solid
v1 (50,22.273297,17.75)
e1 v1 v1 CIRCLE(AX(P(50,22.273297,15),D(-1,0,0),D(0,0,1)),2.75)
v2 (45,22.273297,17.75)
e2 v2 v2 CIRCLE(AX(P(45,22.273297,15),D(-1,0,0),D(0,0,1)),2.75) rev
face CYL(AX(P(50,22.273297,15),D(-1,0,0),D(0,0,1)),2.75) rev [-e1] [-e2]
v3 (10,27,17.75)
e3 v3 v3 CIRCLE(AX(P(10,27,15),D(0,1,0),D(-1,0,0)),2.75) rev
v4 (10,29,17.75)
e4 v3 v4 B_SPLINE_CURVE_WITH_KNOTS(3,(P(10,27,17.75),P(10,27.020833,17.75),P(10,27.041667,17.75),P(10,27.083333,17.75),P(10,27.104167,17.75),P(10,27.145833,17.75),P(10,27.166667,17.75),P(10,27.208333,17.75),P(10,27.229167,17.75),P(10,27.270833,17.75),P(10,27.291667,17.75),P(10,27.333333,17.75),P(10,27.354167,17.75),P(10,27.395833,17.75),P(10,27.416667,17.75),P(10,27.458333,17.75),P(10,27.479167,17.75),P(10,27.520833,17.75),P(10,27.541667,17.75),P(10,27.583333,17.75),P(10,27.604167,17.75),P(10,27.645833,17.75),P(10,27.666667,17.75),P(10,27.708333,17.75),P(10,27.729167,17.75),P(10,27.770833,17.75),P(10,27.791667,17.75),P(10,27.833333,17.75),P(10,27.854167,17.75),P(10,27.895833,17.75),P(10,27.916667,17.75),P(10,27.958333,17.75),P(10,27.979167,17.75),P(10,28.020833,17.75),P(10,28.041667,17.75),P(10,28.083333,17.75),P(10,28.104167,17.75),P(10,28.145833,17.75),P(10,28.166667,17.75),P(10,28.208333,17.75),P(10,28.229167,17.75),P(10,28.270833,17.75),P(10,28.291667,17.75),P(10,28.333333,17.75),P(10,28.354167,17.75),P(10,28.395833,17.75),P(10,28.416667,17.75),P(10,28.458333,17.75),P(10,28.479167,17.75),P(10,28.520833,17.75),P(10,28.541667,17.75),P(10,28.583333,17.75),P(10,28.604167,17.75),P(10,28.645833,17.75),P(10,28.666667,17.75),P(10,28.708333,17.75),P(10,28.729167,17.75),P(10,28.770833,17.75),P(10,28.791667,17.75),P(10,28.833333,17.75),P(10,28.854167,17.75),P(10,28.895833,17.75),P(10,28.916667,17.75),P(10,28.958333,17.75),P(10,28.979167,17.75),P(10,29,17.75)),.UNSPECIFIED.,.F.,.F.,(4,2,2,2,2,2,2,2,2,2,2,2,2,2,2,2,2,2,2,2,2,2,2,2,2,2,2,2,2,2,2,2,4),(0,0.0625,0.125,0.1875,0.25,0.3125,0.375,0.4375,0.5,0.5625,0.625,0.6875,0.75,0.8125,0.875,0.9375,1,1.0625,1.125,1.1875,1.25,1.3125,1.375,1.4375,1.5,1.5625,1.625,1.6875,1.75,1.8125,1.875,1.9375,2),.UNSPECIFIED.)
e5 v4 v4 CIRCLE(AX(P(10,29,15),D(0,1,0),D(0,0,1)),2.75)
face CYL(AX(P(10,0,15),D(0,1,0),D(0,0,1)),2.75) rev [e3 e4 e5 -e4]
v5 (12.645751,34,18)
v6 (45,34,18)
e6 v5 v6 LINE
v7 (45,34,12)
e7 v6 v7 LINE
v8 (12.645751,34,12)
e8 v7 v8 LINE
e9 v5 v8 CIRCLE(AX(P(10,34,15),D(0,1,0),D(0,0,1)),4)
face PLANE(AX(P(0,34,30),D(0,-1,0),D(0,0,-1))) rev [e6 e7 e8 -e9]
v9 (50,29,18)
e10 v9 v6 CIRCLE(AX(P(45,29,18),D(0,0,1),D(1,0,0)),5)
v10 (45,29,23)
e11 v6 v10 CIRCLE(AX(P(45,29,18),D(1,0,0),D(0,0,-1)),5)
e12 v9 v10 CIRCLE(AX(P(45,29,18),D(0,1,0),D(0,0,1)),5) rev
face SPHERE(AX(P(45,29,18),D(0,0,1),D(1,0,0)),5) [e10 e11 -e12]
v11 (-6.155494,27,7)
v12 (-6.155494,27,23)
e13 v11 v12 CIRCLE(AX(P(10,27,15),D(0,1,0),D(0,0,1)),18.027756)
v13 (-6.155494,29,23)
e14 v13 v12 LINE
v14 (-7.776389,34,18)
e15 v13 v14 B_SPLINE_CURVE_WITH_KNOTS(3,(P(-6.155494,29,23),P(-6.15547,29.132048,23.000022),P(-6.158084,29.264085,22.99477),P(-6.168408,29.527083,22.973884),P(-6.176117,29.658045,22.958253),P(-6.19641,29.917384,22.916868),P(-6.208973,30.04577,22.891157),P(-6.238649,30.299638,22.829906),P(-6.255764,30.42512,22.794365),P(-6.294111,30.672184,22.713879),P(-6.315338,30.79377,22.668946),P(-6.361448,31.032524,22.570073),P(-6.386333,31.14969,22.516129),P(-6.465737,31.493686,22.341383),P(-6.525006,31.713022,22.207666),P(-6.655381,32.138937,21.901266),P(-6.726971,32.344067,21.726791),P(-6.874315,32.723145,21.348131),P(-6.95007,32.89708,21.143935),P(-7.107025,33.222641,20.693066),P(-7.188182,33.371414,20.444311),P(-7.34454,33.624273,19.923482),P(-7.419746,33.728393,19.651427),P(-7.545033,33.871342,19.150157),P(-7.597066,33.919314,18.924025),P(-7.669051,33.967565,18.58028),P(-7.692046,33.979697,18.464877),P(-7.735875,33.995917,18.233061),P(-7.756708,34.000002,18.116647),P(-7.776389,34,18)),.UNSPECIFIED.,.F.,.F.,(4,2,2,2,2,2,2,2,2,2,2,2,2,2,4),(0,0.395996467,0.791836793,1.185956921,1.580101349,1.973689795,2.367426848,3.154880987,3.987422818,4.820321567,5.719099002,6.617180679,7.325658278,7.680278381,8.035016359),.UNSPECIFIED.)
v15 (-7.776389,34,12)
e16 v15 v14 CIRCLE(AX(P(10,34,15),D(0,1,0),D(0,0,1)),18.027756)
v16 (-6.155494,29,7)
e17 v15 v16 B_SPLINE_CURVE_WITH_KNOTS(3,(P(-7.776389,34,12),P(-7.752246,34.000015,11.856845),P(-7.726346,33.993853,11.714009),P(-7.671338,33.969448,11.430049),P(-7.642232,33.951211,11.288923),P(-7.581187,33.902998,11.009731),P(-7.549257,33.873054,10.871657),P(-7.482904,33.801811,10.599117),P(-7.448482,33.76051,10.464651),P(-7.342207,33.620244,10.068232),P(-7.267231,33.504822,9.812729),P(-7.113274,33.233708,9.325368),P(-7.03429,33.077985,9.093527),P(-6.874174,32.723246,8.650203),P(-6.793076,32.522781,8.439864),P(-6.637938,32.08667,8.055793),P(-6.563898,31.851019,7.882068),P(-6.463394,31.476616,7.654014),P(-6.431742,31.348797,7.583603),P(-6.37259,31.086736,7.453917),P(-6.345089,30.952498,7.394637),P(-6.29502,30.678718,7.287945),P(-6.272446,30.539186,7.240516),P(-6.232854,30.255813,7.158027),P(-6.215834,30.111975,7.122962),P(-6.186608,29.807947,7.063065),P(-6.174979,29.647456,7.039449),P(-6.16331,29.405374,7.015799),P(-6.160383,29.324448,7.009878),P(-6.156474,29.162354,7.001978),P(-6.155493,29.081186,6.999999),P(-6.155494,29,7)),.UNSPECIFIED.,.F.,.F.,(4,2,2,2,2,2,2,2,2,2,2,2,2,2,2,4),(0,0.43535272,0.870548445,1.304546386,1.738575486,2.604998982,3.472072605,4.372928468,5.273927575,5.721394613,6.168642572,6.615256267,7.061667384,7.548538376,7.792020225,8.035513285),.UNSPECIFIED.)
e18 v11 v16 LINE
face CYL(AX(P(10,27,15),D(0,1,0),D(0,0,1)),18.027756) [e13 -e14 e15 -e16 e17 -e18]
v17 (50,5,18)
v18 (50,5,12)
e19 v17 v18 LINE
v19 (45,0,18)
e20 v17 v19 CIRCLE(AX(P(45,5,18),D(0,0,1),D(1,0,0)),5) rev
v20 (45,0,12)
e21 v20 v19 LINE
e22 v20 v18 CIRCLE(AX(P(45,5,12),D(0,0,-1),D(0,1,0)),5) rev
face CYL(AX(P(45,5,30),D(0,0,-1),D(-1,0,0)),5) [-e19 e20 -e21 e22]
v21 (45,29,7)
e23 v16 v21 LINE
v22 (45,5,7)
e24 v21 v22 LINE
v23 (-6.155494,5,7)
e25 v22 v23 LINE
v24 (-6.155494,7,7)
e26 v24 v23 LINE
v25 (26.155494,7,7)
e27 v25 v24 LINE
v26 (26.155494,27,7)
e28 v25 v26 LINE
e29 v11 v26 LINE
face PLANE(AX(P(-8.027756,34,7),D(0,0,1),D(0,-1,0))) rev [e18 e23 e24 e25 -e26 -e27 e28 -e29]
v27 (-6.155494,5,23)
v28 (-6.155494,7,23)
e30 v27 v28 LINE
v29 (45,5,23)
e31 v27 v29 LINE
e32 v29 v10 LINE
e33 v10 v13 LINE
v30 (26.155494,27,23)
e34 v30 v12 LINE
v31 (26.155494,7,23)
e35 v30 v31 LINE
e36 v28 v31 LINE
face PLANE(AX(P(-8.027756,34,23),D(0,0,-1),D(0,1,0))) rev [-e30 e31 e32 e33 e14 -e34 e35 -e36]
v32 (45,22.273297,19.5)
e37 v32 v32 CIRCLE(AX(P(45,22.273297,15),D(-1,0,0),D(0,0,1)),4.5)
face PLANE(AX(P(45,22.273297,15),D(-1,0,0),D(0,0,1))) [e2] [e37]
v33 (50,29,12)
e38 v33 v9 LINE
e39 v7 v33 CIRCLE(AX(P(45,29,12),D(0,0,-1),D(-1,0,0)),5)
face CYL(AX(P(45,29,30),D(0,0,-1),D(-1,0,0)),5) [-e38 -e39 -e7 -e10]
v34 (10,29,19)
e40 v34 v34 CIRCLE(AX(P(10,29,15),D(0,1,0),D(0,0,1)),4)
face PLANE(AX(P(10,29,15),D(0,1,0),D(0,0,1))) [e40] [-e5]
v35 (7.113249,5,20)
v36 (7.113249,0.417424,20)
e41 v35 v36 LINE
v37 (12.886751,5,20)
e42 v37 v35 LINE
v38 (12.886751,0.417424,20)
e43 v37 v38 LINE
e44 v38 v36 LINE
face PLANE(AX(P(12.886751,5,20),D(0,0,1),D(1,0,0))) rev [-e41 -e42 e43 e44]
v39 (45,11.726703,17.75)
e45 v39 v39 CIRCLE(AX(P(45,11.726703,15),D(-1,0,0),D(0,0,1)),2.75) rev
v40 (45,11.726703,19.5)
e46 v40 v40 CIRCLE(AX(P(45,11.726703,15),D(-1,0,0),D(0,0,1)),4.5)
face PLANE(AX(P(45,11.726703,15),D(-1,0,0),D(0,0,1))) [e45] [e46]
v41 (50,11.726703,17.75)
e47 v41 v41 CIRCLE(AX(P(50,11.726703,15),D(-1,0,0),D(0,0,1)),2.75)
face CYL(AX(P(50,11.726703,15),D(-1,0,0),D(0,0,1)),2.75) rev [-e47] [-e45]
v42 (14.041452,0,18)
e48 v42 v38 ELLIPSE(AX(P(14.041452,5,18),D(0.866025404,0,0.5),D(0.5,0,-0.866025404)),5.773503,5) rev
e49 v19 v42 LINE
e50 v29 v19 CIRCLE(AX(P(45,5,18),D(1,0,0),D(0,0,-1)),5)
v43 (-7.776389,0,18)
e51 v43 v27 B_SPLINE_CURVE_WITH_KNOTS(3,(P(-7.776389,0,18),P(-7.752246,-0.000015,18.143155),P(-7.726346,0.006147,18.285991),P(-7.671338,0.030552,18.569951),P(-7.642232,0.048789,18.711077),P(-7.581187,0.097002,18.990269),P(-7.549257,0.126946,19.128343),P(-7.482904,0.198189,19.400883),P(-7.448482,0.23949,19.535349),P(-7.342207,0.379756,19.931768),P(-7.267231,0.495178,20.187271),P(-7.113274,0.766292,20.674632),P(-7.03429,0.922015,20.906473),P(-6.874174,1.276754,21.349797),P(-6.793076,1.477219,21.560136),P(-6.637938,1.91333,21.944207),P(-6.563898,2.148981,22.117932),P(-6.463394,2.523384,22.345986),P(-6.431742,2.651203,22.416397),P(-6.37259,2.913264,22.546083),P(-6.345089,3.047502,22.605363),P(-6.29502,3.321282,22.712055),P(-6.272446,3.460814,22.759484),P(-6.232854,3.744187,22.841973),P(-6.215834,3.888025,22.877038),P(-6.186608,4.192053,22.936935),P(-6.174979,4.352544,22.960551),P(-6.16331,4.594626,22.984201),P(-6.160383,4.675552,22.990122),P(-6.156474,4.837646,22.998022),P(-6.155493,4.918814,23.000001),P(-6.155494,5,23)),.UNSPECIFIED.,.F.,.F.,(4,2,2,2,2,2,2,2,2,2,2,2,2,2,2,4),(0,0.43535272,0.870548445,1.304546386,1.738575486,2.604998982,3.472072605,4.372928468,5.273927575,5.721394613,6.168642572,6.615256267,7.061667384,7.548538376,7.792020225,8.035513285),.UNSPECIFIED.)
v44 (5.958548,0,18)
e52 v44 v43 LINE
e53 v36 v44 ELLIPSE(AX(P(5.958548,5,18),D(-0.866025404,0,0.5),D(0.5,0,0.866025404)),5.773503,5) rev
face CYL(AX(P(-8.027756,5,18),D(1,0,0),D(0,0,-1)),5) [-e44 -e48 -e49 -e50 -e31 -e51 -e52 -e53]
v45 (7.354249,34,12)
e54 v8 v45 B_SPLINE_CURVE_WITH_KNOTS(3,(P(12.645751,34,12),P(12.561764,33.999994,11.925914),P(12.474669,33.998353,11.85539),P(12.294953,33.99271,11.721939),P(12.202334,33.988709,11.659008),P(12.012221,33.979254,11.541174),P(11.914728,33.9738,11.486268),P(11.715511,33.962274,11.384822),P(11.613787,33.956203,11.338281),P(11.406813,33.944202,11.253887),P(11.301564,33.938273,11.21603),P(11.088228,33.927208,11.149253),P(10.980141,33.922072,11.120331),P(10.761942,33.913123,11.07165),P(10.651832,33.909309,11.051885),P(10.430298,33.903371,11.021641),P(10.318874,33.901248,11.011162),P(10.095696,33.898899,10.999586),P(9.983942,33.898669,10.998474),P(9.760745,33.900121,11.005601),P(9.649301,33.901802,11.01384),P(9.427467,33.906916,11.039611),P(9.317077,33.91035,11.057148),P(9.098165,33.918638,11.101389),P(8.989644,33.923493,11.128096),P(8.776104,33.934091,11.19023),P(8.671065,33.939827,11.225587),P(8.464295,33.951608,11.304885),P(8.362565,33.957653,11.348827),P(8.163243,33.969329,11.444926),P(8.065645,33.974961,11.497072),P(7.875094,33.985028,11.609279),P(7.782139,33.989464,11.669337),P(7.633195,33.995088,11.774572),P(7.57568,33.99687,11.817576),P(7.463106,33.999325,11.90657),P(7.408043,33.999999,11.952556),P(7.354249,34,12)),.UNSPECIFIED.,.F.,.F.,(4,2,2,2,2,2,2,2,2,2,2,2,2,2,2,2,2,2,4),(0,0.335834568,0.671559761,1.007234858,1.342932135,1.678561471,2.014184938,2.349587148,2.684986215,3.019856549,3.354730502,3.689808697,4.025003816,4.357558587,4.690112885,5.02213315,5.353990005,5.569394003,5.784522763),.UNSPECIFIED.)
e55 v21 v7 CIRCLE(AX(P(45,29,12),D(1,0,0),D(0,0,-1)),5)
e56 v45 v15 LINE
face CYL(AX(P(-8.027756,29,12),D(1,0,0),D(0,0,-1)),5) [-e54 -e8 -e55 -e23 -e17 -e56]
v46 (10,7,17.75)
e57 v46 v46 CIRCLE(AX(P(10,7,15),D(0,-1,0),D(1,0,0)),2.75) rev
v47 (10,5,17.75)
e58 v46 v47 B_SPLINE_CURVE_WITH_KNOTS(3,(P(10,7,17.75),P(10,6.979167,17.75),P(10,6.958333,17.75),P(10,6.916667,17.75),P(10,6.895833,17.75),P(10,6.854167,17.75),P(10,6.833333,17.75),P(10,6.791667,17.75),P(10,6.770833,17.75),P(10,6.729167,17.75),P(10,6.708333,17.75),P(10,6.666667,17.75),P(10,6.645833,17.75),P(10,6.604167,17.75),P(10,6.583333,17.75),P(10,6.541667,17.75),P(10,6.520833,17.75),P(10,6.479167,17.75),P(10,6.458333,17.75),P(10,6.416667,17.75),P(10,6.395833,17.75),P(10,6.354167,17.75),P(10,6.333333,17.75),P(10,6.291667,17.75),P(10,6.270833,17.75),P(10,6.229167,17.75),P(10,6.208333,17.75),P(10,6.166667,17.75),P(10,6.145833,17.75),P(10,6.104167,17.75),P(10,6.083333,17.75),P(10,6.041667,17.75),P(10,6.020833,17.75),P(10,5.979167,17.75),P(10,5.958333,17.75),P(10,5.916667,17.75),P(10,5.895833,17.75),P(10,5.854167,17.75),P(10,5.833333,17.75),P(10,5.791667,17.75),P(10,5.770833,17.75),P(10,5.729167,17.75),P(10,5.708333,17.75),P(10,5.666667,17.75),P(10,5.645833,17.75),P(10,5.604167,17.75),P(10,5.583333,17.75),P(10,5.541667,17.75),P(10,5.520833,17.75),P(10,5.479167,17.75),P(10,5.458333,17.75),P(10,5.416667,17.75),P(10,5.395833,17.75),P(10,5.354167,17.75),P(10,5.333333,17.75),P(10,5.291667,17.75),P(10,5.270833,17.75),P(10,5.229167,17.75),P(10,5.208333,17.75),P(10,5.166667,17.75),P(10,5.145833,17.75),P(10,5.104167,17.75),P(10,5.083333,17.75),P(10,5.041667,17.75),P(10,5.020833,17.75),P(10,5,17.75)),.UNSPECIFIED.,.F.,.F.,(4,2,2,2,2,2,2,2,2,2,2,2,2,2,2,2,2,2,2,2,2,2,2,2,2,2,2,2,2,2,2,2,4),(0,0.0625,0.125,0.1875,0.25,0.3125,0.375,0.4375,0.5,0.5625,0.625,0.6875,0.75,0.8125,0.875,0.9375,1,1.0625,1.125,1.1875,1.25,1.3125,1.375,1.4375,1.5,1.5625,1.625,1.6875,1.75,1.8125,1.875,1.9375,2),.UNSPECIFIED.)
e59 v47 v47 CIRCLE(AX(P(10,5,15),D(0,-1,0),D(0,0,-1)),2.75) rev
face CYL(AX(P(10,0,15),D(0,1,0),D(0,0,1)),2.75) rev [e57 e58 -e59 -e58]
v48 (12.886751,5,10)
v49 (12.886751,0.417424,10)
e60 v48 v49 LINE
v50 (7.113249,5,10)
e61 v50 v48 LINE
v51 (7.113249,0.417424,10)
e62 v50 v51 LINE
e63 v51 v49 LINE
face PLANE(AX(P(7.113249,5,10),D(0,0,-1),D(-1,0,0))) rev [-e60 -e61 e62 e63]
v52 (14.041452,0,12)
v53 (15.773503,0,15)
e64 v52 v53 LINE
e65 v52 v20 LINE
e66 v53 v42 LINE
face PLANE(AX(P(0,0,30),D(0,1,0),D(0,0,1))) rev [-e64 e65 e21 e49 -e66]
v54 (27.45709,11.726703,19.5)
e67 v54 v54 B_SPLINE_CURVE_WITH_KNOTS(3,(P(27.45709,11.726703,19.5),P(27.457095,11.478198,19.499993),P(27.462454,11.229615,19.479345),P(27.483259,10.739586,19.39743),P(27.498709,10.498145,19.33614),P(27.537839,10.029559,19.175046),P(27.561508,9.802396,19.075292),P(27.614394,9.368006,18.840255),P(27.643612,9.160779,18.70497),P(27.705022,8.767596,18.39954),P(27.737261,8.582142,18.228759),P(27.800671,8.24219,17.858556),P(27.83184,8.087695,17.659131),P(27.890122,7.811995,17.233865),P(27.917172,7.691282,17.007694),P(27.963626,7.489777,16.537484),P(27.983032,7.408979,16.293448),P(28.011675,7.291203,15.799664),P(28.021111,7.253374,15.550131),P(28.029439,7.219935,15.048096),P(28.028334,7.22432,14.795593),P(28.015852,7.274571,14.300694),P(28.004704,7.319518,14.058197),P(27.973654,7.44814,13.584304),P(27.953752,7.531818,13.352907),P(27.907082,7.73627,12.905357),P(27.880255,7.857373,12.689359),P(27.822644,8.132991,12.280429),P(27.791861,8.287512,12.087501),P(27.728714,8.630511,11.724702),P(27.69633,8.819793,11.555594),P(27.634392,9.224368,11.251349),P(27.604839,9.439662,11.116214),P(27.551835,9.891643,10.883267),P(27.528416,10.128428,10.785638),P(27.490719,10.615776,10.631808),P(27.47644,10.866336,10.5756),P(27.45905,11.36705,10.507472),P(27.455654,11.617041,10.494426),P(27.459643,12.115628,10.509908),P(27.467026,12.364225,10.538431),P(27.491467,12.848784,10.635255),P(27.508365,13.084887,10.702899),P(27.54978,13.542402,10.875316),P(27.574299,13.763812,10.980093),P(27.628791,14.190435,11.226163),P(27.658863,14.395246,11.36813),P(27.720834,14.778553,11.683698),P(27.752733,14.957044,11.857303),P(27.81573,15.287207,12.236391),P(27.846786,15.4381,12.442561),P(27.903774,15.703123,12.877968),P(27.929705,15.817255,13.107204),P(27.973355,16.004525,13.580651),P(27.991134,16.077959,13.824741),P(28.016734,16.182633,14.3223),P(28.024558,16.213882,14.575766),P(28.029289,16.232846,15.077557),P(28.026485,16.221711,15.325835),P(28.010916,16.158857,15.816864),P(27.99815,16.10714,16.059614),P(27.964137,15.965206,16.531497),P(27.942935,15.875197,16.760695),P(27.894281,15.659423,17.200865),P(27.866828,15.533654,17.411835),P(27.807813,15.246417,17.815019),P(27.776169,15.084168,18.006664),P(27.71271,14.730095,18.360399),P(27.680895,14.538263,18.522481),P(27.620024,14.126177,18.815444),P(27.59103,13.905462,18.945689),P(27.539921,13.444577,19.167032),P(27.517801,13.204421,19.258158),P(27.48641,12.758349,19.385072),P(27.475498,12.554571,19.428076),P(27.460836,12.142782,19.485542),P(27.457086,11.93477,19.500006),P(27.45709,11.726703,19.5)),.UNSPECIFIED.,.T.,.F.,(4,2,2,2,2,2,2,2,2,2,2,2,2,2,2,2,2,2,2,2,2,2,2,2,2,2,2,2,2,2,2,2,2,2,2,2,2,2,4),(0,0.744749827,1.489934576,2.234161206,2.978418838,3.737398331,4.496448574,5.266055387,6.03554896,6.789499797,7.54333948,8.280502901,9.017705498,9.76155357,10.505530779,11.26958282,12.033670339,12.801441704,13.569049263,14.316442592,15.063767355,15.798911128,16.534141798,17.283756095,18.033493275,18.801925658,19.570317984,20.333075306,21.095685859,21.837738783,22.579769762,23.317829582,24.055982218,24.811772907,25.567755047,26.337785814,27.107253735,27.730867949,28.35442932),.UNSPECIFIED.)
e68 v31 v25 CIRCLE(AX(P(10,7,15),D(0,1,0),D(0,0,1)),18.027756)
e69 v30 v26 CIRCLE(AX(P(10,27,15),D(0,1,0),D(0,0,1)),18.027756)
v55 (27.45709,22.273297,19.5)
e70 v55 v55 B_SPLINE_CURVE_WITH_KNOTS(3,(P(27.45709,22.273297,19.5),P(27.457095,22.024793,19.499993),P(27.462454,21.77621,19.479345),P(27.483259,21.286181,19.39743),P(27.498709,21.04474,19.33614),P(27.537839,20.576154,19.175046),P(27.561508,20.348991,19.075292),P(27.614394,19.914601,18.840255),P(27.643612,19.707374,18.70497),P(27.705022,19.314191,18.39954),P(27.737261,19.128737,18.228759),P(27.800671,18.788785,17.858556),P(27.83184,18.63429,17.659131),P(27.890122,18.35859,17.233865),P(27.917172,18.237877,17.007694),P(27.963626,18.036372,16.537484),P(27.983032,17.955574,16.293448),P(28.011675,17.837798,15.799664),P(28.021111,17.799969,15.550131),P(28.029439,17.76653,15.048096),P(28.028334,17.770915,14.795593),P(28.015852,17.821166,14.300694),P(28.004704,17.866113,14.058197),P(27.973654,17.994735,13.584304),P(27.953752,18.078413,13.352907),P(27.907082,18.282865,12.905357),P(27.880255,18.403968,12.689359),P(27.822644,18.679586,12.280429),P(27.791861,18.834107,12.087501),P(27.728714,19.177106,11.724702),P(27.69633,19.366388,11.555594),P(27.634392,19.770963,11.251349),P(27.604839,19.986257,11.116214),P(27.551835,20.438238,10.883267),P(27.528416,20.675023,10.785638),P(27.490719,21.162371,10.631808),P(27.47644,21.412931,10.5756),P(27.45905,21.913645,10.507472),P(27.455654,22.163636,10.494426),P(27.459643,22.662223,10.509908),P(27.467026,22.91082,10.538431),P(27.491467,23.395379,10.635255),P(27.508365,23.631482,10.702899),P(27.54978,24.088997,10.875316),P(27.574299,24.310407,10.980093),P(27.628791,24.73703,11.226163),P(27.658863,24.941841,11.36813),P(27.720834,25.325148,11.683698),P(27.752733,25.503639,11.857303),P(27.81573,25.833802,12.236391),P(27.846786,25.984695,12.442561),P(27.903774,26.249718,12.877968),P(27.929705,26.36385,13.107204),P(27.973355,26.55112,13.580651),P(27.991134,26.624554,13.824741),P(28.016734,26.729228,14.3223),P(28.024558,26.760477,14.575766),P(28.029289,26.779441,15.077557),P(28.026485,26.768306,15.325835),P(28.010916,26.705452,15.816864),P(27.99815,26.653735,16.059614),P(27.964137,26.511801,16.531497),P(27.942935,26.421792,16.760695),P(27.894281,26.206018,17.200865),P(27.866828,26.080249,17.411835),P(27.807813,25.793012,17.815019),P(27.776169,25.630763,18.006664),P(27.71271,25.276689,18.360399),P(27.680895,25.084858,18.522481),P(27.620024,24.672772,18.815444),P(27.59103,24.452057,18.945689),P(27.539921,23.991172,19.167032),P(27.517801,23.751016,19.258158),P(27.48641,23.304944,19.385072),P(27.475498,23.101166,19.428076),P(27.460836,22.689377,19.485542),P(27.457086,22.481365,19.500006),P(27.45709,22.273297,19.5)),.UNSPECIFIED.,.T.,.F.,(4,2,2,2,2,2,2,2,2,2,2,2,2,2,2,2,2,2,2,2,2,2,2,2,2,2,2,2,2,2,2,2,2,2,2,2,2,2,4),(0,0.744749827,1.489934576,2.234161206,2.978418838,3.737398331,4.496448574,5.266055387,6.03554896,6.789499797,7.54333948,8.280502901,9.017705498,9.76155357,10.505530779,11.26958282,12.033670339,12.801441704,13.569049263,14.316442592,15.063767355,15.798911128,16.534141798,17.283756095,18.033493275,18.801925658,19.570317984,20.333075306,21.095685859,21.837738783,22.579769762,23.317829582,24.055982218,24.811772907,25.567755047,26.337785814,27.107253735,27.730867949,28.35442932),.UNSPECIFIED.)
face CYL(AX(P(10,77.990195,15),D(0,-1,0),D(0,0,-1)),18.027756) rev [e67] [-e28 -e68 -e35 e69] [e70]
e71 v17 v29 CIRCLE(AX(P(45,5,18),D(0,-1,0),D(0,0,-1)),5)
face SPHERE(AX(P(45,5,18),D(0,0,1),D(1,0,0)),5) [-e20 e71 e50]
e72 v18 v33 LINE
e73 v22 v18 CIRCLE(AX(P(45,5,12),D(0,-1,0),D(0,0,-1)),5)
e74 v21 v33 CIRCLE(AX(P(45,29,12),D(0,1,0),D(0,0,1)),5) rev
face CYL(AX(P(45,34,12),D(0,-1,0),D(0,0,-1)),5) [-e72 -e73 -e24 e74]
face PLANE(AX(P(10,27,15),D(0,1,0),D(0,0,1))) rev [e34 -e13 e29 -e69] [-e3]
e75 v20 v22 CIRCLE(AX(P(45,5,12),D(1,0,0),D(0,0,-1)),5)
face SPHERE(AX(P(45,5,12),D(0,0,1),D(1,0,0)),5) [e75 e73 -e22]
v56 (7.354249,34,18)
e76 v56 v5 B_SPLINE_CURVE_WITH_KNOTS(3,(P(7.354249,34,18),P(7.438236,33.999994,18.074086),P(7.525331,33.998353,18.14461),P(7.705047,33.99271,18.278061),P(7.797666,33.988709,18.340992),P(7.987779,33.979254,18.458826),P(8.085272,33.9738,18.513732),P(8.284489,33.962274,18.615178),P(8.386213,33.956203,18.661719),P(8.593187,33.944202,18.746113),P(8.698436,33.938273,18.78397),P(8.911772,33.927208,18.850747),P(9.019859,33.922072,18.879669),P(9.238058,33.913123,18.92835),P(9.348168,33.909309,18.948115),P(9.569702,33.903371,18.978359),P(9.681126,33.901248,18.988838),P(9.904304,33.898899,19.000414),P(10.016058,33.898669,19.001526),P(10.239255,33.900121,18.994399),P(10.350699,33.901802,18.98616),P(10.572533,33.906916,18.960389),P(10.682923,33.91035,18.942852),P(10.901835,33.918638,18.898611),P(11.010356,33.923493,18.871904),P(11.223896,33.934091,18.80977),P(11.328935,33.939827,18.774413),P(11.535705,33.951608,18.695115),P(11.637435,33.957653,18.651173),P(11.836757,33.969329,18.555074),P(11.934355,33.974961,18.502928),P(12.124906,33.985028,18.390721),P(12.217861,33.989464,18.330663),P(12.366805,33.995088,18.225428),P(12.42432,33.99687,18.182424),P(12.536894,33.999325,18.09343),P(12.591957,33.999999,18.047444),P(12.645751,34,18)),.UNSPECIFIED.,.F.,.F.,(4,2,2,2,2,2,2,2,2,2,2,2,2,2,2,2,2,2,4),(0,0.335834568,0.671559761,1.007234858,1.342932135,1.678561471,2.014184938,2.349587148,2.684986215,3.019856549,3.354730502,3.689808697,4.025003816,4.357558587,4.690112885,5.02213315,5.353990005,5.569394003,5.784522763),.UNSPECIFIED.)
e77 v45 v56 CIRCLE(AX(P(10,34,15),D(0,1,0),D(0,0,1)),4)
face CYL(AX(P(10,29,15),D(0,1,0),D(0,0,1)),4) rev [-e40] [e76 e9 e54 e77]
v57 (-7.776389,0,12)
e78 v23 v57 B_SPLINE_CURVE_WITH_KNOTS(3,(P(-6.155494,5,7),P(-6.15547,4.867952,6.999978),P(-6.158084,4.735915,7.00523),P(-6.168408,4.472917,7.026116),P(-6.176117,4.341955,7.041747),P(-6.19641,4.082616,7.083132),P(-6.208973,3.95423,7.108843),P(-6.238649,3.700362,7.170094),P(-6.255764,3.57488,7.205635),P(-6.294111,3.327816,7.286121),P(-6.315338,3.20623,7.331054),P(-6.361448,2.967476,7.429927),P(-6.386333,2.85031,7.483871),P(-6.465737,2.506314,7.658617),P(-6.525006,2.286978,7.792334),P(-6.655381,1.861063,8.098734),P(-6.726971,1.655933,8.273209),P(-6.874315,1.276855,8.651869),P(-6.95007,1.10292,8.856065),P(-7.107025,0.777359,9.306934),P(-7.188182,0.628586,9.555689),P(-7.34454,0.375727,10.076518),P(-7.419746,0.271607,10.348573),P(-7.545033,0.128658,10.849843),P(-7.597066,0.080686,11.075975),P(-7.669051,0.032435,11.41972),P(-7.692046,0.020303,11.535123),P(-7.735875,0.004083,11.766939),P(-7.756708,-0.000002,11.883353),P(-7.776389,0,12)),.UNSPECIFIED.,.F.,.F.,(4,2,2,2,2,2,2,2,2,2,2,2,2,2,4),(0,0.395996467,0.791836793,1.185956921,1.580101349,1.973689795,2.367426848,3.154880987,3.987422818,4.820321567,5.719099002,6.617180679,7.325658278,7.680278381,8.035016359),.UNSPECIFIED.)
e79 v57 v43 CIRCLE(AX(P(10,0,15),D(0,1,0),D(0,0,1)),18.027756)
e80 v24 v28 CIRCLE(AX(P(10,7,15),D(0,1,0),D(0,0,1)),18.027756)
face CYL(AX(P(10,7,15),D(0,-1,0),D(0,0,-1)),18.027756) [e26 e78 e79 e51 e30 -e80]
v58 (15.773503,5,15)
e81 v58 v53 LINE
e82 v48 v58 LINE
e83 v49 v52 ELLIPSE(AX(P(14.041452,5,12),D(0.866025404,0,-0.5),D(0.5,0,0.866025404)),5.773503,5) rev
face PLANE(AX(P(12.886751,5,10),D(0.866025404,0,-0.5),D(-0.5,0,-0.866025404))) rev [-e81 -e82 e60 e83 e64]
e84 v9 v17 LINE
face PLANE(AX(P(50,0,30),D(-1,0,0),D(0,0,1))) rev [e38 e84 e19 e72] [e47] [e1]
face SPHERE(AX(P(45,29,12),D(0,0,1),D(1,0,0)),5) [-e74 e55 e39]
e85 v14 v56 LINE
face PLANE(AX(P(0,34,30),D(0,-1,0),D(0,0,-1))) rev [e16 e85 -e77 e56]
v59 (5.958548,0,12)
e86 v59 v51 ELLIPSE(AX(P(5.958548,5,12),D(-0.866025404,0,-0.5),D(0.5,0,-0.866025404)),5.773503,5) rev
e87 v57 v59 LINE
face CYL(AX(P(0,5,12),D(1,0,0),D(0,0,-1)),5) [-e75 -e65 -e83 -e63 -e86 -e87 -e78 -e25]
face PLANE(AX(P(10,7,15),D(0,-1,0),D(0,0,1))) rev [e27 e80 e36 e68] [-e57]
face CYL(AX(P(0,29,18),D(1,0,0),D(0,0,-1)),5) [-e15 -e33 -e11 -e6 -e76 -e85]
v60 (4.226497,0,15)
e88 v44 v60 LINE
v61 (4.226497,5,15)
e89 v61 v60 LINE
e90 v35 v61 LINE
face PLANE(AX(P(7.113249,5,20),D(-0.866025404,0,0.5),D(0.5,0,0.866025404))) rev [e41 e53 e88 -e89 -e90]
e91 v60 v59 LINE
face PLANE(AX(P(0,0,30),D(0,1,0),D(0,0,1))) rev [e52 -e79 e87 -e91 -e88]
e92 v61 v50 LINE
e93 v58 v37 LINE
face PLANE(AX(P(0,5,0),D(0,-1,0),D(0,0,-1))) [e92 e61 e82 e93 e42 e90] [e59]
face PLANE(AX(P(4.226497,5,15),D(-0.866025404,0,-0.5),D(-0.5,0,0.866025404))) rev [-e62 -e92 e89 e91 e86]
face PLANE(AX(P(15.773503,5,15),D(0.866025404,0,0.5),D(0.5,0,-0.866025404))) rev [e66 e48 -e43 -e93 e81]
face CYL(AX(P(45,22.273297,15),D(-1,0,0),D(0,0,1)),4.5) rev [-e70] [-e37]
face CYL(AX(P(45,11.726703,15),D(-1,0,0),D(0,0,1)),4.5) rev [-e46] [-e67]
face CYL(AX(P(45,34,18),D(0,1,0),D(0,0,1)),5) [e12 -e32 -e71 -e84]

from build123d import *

# Parameters (mm, degrees)
ESQUISSE1_W             = 50
ESQUISSE1_H             = 34
BOSS_EXTRU_1_DEPTH      = 30
BOSS_EXTRU_2_DEPTH      = 7
ESQUISSE4_R             = 4
ENL_V_MAT_EXTRU_1_DEPTH = 5
ESQUISSE5_R             = 2.75
ENL_V_MAT_EXTRU_2_DEPTH = 66.122960621
ENL_V_MAT_EXTRU_3_DEPTH = 5
ESQUISSE7_R             = 2.75
ENL_V_MAT_EXTRU_4_DEPTH = 68.498148123
ESQUISSE8_R             = 4.5
ENL_V_MAT_EXTRU_5_DEPTH = 45
ESQUISSE9_W             = 20
ESQUISSE9_H             = 20
ENL_V_MAT_EXTRU_6_DEPTH = 68.498148123
ESQUISSE11_R            = 18.027756377
ENL_V_MAT_EXTRU_7_DEPTH = 20
ESQUISSE12_W            = 7
ESQUISSE12_H            = 34
ENL_V_MAT_EXTRU_8_DEPTH = 74.642518399
CONG_1_R                = 5


with BuildPart() as part:
    # Esquisse1 → Boss.-Extru.1 (new body)
    with BuildSketch(Plane.XY):
        with Locations((25, 17)):
            Rectangle(ESQUISSE1_W, ESQUISSE1_H)
    extrude(amount=BOSS_EXTRU_1_DEPTH)

    # Esquisse3 → Boss.-Extru.2 (add)
    with BuildSketch(Plane(origin=(0, 34, 0), x_dir=(1, 0, 0), z_dir=(0, 1, 0))):
        with BuildLine():
            Line((0, 0), (0, -30))
            ThreePointArc((0, -30), (-8.027756377, -15), (0, 0))
        make_face()
    boss_extru_2 = extrude(amount=-BOSS_EXTRU_2_DEPTH)

    # Symétrie1: Boss.-Extru.2 across plane
    add(boss_extru_2.mirror(Plane.ZX.offset(17)))

    # Esquisse4 → Enlèv. mat.-Extru.1 (cut)
    with BuildSketch(Plane(origin=(0, 34, 0), x_dir=(1, 0, 0), z_dir=(0, 1, 0))):
        with Locations(Location((10, -15, 0), (0, 0, 270))):
            Circle(ESQUISSE4_R)
    extrude(amount=-ENL_V_MAT_EXTRU_1_DEPTH, mode=Mode.SUBTRACT)

    # Esquisse5 → Enlèv. mat.-Extru.2 (cut, through all)
    with BuildSketch(Plane(origin=(0, 29, 0), x_dir=(1, 0, 0), z_dir=(0, 1, 0))):
        with Locations(Location((10, -15, 0), (0, 0, 270))):
            Circle(ESQUISSE5_R)
    extrude(amount=-ENL_V_MAT_EXTRU_2_DEPTH, mode=Mode.SUBTRACT)

    # Esquisse6 → Enlèv. mat.-Extru.3 (cut)
    with BuildSketch(Plane.XZ):
        Polygon((7.113248654, 20), (4.226497308, 15), (7.113248654, 10), (12.886751346, 10), (15.773502692, 15), (12.886751346, 20), align=None)
    extrude(amount=-ENL_V_MAT_EXTRU_3_DEPTH, mode=Mode.SUBTRACT)

    # Esquisse7 → Enlèv. mat.-Extru.4 (cut, through all)
    with BuildSketch(Plane.ZY):
        with Locations((15, 11.726702535)):
            Circle(ESQUISSE7_R)
        with Locations((15, 22.273297465)):
            Circle(ESQUISSE7_R)
    extrude(amount=-ENL_V_MAT_EXTRU_4_DEPTH, mode=Mode.SUBTRACT)

    # Esquisse8 → Enlèv. mat.-Extru.5 (cut)
    with BuildSketch(Plane.ZY):
        with Locations((15, 11.726702535)):
            Circle(ESQUISSE8_R)
        with Locations((15, 22.273297465)):
            Circle(ESQUISSE8_R)
    extrude(amount=-ENL_V_MAT_EXTRU_5_DEPTH, mode=Mode.SUBTRACT)

    # Esquisse9 → Enlèv. mat.-Extru.6 (cut, through all)
    with BuildSketch(Plane(origin=(0, 0, 0), x_dir=(-1, 0, 0), z_dir=(0, 0, -1))):
        with Locations((-10, 17)):
            Rectangle(ESQUISSE9_W, ESQUISSE9_H)
    extrude(amount=-ENL_V_MAT_EXTRU_6_DEPTH, mode=Mode.SUBTRACT)

    # Esquisse11 → Enlèv. mat.-Extru.7 (cut)
    with BuildSketch(Plane(origin=(0, 7, 0), x_dir=(1, 0, 0), z_dir=(0, 1, 0))):
        with Locations((10, -15)):
            Circle(ESQUISSE11_R)
    extrude(amount=ENL_V_MAT_EXTRU_7_DEPTH, mode=Mode.SUBTRACT)

    # Esquisse12 → Enlèv. mat.-Extru.8 (cut, through all)
    with BuildSketch(Plane(origin=(50, 0, 0), x_dir=(0, 0, -1), z_dir=(1, 0, 0))):
        with Locations((-3.5, 17)):
            Rectangle(ESQUISSE12_W, ESQUISSE12_H)
        with Locations((-26.5, 17)):
            Rectangle(ESQUISSE12_W, ESQUISSE12_H)
    extrude(amount=-ENL_V_MAT_EXTRU_8_DEPTH, mode=Mode.SUBTRACT)

    # Congé1
    # the kernel refuses this fillet: 5 mm, written as the material it takes off along each edge
    with BuildSketch(Plane(origin=(45, 5, 12), x_dir=(1, 0, 0), z_dir=(0, -1, 0))) as cong_1_piece_1_section:
        Polygon((0, 0), (CONG_1_R, 0), (CONG_1_R, -CONG_1_R), (0, -CONG_1_R), align=None)
    cong_1_piece_1 = extrude(amount=CONG_1_R, mode=Mode.PRIVATE)
    cong_1_piece_1 = cong_1_piece_1 - Plane(origin=(45, 5, 12), x_dir=(-0.7071067811865475, 0, 0.7071067811865475), z_dir=(0, -1, 0)) * Sphere(CONG_1_R, mode=Mode.PRIVATE)
    add(cong_1_piece_1, mode=Mode.SUBTRACT)
    with BuildSketch(Plane(origin=(45, 5, 18), x_dir=(1, 0, 0), z_dir=(0, -1, 0))) as cong_1_piece_2_section:
        Polygon((0, 0), (CONG_1_R, 0), (CONG_1_R, CONG_1_R), (0, CONG_1_R), align=None)
    cong_1_piece_2 = extrude(amount=CONG_1_R, mode=Mode.PRIVATE)
    cong_1_piece_2 = cong_1_piece_2 - Plane(origin=(45, 5, 18), x_dir=(-0.7071067811865475, 0, -0.7071067811865475), z_dir=(0, -1, 0)) * Sphere(CONG_1_R, mode=Mode.PRIVATE)
    add(cong_1_piece_2, mode=Mode.SUBTRACT)
    with BuildSketch(Plane(origin=(45, 29, 12), x_dir=(0, 1, 0), z_dir=(1, 0, 0))) as cong_1_piece_3_section:
        Polygon((0, 0), (CONG_1_R, 0), (CONG_1_R, -CONG_1_R), (0, -CONG_1_R), align=None)
    cong_1_piece_3 = extrude(amount=CONG_1_R, mode=Mode.PRIVATE)
    cong_1_piece_3 = cong_1_piece_3 - Plane(origin=(45, 29, 12), x_dir=(0, -0.7071067811865475, 0.7071067811865475), z_dir=(1, 0, 0)) * Sphere(CONG_1_R, mode=Mode.PRIVATE)
    add(cong_1_piece_3, mode=Mode.SUBTRACT)
    with BuildSketch(Plane(origin=(45, 29, 18), x_dir=(0, 0, 1), z_dir=(1, 0, 0))) as cong_1_piece_4_section:
        Polygon((0, 0), (CONG_1_R, 0), (CONG_1_R, -CONG_1_R), (0, -CONG_1_R), align=None)
    cong_1_piece_4 = extrude(amount=CONG_1_R, mode=Mode.PRIVATE)
    cong_1_piece_4 = cong_1_piece_4 - Plane(origin=(45, 29, 18), x_dir=(0, -0.7071067811865475, -0.7071067811865476), z_dir=(1, 0, 0)) * Sphere(CONG_1_R, mode=Mode.PRIVATE)
    add(cong_1_piece_4, mode=Mode.SUBTRACT)
    with BuildSketch(Plane(origin=(50, 0, 12), x_dir=(-1, 0, 0), z_dir=(0, 0, 1)), Plane(origin=(50, 34, 12), x_dir=(0, -1, 0), z_dir=(0, 0, 1))) as cong_1_piece_5:
        with BuildLine():
            CenterArc((CONG_1_R, -CONG_1_R), CONG_1_R, 90, 90)
            Line((0, -CONG_1_R), (0, 0))
            Line((0, 0), (CONG_1_R, 0))
        make_face()
    extrude(amount=6, mode=Mode.SUBTRACT)
    with BuildSketch(Plane(origin=(50, 29, 7), x_dir=(0, 0, 1), z_dir=(0, -1, 0))) as cong_1_piece_6:
        with BuildLine():
            CenterArc((CONG_1_R, CONG_1_R), CONG_1_R, 180, 90)
            Line((0, CONG_1_R), (0, 0))
            Line((0, 0), (CONG_1_R, 0))
        make_face()
    extrude(amount=24, mode=Mode.SUBTRACT)
    with BuildSketch(Plane(origin=(50, 29, 23), x_dir=(0, 0, -1), z_dir=(0, -1, 0))) as cong_1_piece_7:
        with BuildLine():
            CenterArc((CONG_1_R, -CONG_1_R), CONG_1_R, 90, 90)
            Line((0, -CONG_1_R), (0, 0))
            Line((0, 0), (CONG_1_R, 0))
        make_face()
    extrude(amount=24, mode=Mode.SUBTRACT)
    with BuildSketch(Plane(origin=(45, 34, 7), x_dir=(0, -1, 0), z_dir=(-1, 0, 0)), Plane(origin=(45, 0, 7), x_dir=(0, 0, 1), z_dir=(-1, 0, 0))) as cong_1_piece_8:
        with BuildLine():
            CenterArc((CONG_1_R, CONG_1_R), CONG_1_R, 180, 90)
            Line((0, CONG_1_R), (0, 0))
            Line((0, 0), (CONG_1_R, 0))
        make_face()
    extrude(amount=63.655494421, mode=Mode.SUBTRACT)
    with BuildSketch(Plane(origin=(45, 34, 23), x_dir=(0, -1, 0), z_dir=(-1, 0, 0)), Plane(origin=(45, 0, 23), x_dir=(0, 0, -1), z_dir=(-1, 0, 0))) as cong_1_piece_9:
        with BuildLine():
            CenterArc((CONG_1_R, -CONG_1_R), CONG_1_R, 90, 90)
            Line((0, -CONG_1_R), (0, 0))
            Line((0, 0), (CONG_1_R, 0))
        make_face()
    extrude(amount=63.655494421, mode=Mode.SUBTRACT)


solid = part.part
